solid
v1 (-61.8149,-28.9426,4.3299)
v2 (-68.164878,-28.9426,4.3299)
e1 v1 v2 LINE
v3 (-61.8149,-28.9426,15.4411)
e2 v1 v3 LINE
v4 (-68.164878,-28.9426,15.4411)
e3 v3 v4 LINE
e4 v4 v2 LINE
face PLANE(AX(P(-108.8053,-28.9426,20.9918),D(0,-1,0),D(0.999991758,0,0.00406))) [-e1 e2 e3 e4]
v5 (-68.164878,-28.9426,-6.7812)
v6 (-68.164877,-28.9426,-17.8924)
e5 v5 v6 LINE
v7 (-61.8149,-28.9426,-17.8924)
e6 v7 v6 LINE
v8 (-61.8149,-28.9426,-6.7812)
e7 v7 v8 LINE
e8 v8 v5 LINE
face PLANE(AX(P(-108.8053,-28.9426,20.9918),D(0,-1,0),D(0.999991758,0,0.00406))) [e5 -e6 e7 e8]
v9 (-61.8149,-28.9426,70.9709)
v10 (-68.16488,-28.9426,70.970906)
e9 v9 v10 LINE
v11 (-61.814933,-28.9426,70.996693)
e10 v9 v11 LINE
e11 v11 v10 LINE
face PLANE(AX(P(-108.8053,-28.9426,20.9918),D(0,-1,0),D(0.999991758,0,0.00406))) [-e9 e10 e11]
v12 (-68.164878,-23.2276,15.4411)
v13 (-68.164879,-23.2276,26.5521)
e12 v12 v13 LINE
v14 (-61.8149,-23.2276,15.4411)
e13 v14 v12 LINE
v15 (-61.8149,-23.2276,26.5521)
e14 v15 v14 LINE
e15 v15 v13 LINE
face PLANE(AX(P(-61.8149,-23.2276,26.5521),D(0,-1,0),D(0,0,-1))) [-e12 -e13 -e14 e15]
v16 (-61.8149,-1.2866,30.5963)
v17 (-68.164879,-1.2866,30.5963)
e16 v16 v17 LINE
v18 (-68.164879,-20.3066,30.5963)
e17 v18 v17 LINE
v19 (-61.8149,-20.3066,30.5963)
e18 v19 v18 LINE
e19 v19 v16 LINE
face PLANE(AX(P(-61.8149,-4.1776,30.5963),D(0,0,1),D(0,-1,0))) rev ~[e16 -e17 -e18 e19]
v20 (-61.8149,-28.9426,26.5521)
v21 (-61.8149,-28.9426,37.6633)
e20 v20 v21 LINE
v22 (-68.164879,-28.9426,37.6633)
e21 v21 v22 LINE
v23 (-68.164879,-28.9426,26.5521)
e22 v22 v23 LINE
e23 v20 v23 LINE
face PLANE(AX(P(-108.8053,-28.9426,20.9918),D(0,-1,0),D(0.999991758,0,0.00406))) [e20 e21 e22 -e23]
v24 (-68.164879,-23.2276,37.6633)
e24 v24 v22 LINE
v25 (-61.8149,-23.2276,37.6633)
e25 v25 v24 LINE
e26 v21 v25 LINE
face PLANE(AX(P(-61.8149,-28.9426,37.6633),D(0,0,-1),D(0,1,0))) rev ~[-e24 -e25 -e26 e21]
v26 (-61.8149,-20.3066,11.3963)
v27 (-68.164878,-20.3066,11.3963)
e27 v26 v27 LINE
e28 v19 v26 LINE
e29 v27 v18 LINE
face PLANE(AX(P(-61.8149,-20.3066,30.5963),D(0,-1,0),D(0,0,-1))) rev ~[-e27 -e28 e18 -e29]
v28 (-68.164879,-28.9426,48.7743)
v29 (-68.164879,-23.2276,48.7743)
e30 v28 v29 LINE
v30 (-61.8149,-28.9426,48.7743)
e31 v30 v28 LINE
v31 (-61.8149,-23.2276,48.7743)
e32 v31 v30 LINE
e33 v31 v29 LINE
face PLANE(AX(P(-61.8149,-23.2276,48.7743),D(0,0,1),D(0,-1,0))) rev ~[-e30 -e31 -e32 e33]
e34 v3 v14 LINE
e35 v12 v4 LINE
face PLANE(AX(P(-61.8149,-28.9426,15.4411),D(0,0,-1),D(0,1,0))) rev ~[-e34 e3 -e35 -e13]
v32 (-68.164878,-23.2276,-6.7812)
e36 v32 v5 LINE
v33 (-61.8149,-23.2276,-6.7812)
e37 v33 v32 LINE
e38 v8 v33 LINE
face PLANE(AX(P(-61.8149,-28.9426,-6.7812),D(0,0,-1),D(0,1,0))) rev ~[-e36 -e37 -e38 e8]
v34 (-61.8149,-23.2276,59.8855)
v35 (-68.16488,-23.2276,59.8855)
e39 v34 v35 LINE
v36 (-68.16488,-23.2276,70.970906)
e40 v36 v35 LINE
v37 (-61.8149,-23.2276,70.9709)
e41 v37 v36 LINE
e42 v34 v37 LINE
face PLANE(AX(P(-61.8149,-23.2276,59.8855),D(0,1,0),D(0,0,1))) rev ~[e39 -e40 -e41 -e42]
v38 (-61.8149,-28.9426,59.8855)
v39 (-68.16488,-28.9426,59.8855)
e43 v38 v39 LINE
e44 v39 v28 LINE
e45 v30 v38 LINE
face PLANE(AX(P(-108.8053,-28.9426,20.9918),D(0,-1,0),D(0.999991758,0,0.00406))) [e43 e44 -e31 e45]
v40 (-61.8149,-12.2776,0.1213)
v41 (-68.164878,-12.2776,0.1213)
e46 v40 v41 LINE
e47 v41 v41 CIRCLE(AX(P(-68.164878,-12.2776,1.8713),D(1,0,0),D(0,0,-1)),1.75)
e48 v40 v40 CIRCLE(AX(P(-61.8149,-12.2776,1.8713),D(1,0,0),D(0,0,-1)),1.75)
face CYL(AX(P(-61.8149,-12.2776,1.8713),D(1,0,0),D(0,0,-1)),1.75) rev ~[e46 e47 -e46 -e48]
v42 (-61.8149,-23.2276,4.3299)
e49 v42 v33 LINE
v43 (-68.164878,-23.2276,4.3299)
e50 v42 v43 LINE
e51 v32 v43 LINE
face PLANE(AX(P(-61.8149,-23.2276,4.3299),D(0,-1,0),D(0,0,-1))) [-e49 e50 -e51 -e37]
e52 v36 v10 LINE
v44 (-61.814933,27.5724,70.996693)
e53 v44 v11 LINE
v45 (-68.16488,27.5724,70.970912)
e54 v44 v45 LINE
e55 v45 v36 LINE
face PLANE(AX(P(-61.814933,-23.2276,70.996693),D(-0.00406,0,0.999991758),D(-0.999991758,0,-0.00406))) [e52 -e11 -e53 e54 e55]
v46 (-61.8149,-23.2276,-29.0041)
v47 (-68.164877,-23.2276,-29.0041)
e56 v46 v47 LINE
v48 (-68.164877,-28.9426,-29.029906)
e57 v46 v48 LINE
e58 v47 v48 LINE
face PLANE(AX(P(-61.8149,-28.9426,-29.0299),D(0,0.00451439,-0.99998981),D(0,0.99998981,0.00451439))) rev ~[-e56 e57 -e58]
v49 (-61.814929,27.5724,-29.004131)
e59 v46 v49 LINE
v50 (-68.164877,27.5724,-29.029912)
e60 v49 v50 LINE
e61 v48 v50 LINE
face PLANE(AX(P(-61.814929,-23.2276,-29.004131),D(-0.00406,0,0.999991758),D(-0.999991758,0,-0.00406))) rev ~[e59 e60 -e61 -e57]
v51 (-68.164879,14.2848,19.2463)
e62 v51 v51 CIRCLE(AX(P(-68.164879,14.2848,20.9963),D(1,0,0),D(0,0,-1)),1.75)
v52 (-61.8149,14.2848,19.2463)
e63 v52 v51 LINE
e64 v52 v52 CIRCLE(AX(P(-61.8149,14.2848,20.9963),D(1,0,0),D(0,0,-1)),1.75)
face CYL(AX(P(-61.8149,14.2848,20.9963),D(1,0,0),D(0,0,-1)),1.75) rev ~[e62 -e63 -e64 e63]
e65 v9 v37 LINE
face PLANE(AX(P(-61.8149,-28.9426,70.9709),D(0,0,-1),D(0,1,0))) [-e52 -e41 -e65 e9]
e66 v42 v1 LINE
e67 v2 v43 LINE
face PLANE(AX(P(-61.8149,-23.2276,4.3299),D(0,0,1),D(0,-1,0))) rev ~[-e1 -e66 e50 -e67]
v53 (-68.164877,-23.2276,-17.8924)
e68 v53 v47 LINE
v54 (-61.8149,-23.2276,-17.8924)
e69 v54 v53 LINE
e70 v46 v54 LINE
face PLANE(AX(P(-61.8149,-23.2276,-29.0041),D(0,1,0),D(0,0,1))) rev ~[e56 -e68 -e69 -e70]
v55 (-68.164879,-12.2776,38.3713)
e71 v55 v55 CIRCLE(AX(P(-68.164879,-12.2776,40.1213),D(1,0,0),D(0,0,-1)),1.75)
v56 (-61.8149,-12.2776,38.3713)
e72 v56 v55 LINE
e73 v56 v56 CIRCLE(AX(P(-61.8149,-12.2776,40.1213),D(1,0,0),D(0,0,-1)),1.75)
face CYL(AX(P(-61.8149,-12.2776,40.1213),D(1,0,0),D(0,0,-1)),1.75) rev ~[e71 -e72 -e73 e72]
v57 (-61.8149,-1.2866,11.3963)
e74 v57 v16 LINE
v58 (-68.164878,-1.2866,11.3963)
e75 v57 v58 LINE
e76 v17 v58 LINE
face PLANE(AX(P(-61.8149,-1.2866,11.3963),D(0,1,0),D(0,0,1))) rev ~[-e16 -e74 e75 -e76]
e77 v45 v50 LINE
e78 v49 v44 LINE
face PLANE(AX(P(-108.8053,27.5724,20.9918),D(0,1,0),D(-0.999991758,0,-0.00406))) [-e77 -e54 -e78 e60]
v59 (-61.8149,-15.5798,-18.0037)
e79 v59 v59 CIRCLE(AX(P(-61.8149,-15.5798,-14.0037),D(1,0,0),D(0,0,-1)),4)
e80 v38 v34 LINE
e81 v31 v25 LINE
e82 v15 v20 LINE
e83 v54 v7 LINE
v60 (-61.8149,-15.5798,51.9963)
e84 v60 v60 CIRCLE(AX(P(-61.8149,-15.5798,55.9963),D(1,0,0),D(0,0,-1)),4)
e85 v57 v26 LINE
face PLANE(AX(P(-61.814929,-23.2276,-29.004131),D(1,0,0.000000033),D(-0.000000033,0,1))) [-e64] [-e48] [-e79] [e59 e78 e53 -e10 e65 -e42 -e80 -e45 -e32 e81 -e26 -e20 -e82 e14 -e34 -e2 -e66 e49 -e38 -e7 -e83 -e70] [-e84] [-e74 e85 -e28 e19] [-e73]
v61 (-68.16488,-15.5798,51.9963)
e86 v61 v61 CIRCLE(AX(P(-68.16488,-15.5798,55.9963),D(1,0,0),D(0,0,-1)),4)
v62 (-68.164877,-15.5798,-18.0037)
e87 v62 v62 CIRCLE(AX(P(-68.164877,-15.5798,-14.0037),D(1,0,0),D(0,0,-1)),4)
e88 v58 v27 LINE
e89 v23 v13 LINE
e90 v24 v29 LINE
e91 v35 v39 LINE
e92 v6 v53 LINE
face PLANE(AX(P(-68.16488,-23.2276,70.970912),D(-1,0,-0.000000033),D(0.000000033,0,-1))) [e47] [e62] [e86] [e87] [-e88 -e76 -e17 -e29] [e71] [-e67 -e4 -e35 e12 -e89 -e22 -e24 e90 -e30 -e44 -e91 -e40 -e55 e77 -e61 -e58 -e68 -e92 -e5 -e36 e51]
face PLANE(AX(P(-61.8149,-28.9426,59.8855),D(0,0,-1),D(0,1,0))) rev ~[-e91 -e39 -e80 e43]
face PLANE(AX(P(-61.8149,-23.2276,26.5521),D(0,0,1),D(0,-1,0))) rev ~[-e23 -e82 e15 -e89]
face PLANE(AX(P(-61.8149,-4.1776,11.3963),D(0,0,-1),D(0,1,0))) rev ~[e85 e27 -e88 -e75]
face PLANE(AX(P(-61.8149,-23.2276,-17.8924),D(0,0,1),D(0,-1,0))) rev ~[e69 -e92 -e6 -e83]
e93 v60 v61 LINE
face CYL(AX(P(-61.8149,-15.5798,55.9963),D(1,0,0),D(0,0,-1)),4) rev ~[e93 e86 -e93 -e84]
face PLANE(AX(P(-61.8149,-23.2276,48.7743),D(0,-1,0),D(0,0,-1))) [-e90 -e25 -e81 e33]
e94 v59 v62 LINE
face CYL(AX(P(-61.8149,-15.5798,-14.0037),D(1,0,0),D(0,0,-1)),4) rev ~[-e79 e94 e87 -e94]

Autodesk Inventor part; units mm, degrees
ref_plane "YZ Plane" through (0, 0, 0) normal (1, 0, 0) x (0, 1, 0)
ref_plane "XZ Plane" through (0, 0, 0) normal (0, 1, 0) x (-1, 0, 0)
ref_plane "Work Plane1" through (-108.8053, -23.2276, 20.9918) normal (0, 1, 0) x (-0.9999918, 0, -0.00406)
sketch "Sketch1" plane through (-108.8053, -23.2276, 20.9918) normal (0, 1, 0) x (-0.9999918, 0, -0.00406)
  line L0 (-46.787, -50.1863) -> (-47.193, 49.8137)
  line L1 (-47.193, 49.8137) -> (-40.843, 49.8137)
  line L2 (-46.787, -50.1863) -> (-40.437, -50.1863)
  line L3 (-46.787, -50.1863) -> (-40.437, -50.1863)
  line L4 (-40.843, 49.8137) -> (-40.437, -50.1863)
  line L5 (-47.193, 49.8137) -> (46.787, 50.1953) construction
  line L6 (-38.1849, 20.7247) -> (-38.1707, 17.2247)
  line L7 (-38.0296, -17.525) -> (-38.0154, -21.025)
  point P0 (-108.7192, -21.4334)
  dimension "d0" = 6.35
  dimension "d1" = 6.35
extrude "Extrusion1" add sketch "Sketch1" along normal blind 50.8 and the other way blind 6.35
sketch "Sketch2" plane through (-61.8149, -29.5776, 70.9967) normal (1, 0, 0) x (0, 0, -1)
  line L0 (100.0008, 0) -> (100.0008, 57.15) construction
  line L1 (0, 57.15) -> (100.0008, 57.15) construction
  line L2 (0, 0) -> (0, 57.15) construction
  line L3 (0, 57.15) -> (100.0008, 57.15) construction
  line L4 (50.0004, 57.15) -> (50.0004, 0) construction
  circle A0 centre (15.0004, 13.9978) radius 4
  circle A1 centre (85.0004, 13.9978) radius 4
  line L5 (40.4004, 9.271) -> (59.6004, 9.271)
  line L6 (59.6004, 9.271) -> (59.6004, 28.291)
  line L7 (59.6004, 28.291) -> (40.4004, 28.291)
  line L8 (40.4004, 28.291) -> (40.4004, 9.271)
  line L9 (21.3504, 9.271) -> (21.3504, 25.4) construction
  line L10 (21.3504, 20.3478) -> (13.3504, 20.3478) construction
  line L11 (21.3504, 9.271) -> (21.3504, 25.4) projected
  line L12 (78.6504, 9.271) -> (78.6504, 25.4) projected
  line L13 (11.1112, 0.635) -> (11.1112, 6.35)
  line L14 (22.2224, 6.35) -> (22.2224, 0.635)
  line L15 (33.3334, 0.635) -> (33.3334, 6.35)
  line L16 (44.4446, 6.35) -> (44.4446, 0.635)
  line L17 (55.5556, 0.635) -> (55.5556, 6.35)
  line L18 (66.6668, 6.35) -> (66.6668, 0.635)
  line L19 (88.8891, 6.35) -> (88.8891, 0.635)
  line L20 (77.7779, 0.635) -> (77.7779, 6.35)
  line L21 (0.0258, 0.635) -> (0.0258, 6.35) construction
  line L22 (0.0258, 57.15) -> (0.0258, 0.635) construction
  line L23 (88.8891, 0.635) -> (100.0266, 0.635)
  line L24 (100.0008, 6.35) -> (88.8891, 6.35)
  line L25 (77.7779, 0.635) -> (66.6668, 0.635)
  line L26 (66.6668, 6.35) -> (77.7779, 6.35)
  line L27 (55.5556, 0.635) -> (44.4446, 0.635)
  line L28 (44.4446, 6.35) -> (55.5556, 6.35)
  line L29 (33.3334, 0.635) -> (22.2224, 0.635)
  line L30 (22.2224, 6.35) -> (33.3334, 6.35)
  line L31 (11.1112, 0.635) -> (0.0258, 0.635)
  line L32 (11.1112, 6.35) -> (0.0258, 6.35)
  line L33 (0.0258, 0.635) -> (0.0258, 6.35)
  line L34 (100.0266, 0.635) -> (100.0008, 6.35)
  line L35 (59.6004, 9.271) -> (59.6004, 25.4) projected
  line L36 (40.4004, 9.271) -> (40.4004, 25.4) projected
  circle A2 centre (30.8754, 17.3) radius 1.75
  circle A3 centre (69.1254, 17.3) radius 1.75
  circle A4 centre (50.0004, 43.8624) radius 1.75
  point P0 (70.9967, 23.2276)
  point P1 (75.0381, 0)
  dimension "d9" = 8
  dimension "d10" = 8
  dimension "d13" = 35
  dimension "d14" = 8
  dimension "d26" = 5.715
  dimension "d27" = 5.715
  dimension "d28" = 5.715
  dimension "d29" = 5.715
  dimension "d30" = 5.715
extrude "Extrusion2" cut sketch "Sketch2" against normal blind 35
sketch "Sketch4" plane through (-108.8053, -29.5776, 20.9918) normal (0, -1, 0) x (0.9999918, 0, 0.00406)
  line L0 (46.787, -50.1863) -> (47.193, 49.8137) projected
  line L1 (47.193, 49.8137) -> (40.843, 49.8137) projected
  line L2 (40.843, 49.8137) -> (40.437, -50.1863) projected
  line L3 (40.437, -50.1863) -> (46.787, -50.1863) projected
  point P0 (108.7192, -21.4334)
extrude "Extrusion3" cut sketch "Sketch4" against normal up to surface (0.635 mm away)
equation "\"d27\" = d26"
equation "\"d28\" = d26"
equation "\"d29\" = d26"
equation "\"d30\" = d26"
equation "\"d11\" = d13"
